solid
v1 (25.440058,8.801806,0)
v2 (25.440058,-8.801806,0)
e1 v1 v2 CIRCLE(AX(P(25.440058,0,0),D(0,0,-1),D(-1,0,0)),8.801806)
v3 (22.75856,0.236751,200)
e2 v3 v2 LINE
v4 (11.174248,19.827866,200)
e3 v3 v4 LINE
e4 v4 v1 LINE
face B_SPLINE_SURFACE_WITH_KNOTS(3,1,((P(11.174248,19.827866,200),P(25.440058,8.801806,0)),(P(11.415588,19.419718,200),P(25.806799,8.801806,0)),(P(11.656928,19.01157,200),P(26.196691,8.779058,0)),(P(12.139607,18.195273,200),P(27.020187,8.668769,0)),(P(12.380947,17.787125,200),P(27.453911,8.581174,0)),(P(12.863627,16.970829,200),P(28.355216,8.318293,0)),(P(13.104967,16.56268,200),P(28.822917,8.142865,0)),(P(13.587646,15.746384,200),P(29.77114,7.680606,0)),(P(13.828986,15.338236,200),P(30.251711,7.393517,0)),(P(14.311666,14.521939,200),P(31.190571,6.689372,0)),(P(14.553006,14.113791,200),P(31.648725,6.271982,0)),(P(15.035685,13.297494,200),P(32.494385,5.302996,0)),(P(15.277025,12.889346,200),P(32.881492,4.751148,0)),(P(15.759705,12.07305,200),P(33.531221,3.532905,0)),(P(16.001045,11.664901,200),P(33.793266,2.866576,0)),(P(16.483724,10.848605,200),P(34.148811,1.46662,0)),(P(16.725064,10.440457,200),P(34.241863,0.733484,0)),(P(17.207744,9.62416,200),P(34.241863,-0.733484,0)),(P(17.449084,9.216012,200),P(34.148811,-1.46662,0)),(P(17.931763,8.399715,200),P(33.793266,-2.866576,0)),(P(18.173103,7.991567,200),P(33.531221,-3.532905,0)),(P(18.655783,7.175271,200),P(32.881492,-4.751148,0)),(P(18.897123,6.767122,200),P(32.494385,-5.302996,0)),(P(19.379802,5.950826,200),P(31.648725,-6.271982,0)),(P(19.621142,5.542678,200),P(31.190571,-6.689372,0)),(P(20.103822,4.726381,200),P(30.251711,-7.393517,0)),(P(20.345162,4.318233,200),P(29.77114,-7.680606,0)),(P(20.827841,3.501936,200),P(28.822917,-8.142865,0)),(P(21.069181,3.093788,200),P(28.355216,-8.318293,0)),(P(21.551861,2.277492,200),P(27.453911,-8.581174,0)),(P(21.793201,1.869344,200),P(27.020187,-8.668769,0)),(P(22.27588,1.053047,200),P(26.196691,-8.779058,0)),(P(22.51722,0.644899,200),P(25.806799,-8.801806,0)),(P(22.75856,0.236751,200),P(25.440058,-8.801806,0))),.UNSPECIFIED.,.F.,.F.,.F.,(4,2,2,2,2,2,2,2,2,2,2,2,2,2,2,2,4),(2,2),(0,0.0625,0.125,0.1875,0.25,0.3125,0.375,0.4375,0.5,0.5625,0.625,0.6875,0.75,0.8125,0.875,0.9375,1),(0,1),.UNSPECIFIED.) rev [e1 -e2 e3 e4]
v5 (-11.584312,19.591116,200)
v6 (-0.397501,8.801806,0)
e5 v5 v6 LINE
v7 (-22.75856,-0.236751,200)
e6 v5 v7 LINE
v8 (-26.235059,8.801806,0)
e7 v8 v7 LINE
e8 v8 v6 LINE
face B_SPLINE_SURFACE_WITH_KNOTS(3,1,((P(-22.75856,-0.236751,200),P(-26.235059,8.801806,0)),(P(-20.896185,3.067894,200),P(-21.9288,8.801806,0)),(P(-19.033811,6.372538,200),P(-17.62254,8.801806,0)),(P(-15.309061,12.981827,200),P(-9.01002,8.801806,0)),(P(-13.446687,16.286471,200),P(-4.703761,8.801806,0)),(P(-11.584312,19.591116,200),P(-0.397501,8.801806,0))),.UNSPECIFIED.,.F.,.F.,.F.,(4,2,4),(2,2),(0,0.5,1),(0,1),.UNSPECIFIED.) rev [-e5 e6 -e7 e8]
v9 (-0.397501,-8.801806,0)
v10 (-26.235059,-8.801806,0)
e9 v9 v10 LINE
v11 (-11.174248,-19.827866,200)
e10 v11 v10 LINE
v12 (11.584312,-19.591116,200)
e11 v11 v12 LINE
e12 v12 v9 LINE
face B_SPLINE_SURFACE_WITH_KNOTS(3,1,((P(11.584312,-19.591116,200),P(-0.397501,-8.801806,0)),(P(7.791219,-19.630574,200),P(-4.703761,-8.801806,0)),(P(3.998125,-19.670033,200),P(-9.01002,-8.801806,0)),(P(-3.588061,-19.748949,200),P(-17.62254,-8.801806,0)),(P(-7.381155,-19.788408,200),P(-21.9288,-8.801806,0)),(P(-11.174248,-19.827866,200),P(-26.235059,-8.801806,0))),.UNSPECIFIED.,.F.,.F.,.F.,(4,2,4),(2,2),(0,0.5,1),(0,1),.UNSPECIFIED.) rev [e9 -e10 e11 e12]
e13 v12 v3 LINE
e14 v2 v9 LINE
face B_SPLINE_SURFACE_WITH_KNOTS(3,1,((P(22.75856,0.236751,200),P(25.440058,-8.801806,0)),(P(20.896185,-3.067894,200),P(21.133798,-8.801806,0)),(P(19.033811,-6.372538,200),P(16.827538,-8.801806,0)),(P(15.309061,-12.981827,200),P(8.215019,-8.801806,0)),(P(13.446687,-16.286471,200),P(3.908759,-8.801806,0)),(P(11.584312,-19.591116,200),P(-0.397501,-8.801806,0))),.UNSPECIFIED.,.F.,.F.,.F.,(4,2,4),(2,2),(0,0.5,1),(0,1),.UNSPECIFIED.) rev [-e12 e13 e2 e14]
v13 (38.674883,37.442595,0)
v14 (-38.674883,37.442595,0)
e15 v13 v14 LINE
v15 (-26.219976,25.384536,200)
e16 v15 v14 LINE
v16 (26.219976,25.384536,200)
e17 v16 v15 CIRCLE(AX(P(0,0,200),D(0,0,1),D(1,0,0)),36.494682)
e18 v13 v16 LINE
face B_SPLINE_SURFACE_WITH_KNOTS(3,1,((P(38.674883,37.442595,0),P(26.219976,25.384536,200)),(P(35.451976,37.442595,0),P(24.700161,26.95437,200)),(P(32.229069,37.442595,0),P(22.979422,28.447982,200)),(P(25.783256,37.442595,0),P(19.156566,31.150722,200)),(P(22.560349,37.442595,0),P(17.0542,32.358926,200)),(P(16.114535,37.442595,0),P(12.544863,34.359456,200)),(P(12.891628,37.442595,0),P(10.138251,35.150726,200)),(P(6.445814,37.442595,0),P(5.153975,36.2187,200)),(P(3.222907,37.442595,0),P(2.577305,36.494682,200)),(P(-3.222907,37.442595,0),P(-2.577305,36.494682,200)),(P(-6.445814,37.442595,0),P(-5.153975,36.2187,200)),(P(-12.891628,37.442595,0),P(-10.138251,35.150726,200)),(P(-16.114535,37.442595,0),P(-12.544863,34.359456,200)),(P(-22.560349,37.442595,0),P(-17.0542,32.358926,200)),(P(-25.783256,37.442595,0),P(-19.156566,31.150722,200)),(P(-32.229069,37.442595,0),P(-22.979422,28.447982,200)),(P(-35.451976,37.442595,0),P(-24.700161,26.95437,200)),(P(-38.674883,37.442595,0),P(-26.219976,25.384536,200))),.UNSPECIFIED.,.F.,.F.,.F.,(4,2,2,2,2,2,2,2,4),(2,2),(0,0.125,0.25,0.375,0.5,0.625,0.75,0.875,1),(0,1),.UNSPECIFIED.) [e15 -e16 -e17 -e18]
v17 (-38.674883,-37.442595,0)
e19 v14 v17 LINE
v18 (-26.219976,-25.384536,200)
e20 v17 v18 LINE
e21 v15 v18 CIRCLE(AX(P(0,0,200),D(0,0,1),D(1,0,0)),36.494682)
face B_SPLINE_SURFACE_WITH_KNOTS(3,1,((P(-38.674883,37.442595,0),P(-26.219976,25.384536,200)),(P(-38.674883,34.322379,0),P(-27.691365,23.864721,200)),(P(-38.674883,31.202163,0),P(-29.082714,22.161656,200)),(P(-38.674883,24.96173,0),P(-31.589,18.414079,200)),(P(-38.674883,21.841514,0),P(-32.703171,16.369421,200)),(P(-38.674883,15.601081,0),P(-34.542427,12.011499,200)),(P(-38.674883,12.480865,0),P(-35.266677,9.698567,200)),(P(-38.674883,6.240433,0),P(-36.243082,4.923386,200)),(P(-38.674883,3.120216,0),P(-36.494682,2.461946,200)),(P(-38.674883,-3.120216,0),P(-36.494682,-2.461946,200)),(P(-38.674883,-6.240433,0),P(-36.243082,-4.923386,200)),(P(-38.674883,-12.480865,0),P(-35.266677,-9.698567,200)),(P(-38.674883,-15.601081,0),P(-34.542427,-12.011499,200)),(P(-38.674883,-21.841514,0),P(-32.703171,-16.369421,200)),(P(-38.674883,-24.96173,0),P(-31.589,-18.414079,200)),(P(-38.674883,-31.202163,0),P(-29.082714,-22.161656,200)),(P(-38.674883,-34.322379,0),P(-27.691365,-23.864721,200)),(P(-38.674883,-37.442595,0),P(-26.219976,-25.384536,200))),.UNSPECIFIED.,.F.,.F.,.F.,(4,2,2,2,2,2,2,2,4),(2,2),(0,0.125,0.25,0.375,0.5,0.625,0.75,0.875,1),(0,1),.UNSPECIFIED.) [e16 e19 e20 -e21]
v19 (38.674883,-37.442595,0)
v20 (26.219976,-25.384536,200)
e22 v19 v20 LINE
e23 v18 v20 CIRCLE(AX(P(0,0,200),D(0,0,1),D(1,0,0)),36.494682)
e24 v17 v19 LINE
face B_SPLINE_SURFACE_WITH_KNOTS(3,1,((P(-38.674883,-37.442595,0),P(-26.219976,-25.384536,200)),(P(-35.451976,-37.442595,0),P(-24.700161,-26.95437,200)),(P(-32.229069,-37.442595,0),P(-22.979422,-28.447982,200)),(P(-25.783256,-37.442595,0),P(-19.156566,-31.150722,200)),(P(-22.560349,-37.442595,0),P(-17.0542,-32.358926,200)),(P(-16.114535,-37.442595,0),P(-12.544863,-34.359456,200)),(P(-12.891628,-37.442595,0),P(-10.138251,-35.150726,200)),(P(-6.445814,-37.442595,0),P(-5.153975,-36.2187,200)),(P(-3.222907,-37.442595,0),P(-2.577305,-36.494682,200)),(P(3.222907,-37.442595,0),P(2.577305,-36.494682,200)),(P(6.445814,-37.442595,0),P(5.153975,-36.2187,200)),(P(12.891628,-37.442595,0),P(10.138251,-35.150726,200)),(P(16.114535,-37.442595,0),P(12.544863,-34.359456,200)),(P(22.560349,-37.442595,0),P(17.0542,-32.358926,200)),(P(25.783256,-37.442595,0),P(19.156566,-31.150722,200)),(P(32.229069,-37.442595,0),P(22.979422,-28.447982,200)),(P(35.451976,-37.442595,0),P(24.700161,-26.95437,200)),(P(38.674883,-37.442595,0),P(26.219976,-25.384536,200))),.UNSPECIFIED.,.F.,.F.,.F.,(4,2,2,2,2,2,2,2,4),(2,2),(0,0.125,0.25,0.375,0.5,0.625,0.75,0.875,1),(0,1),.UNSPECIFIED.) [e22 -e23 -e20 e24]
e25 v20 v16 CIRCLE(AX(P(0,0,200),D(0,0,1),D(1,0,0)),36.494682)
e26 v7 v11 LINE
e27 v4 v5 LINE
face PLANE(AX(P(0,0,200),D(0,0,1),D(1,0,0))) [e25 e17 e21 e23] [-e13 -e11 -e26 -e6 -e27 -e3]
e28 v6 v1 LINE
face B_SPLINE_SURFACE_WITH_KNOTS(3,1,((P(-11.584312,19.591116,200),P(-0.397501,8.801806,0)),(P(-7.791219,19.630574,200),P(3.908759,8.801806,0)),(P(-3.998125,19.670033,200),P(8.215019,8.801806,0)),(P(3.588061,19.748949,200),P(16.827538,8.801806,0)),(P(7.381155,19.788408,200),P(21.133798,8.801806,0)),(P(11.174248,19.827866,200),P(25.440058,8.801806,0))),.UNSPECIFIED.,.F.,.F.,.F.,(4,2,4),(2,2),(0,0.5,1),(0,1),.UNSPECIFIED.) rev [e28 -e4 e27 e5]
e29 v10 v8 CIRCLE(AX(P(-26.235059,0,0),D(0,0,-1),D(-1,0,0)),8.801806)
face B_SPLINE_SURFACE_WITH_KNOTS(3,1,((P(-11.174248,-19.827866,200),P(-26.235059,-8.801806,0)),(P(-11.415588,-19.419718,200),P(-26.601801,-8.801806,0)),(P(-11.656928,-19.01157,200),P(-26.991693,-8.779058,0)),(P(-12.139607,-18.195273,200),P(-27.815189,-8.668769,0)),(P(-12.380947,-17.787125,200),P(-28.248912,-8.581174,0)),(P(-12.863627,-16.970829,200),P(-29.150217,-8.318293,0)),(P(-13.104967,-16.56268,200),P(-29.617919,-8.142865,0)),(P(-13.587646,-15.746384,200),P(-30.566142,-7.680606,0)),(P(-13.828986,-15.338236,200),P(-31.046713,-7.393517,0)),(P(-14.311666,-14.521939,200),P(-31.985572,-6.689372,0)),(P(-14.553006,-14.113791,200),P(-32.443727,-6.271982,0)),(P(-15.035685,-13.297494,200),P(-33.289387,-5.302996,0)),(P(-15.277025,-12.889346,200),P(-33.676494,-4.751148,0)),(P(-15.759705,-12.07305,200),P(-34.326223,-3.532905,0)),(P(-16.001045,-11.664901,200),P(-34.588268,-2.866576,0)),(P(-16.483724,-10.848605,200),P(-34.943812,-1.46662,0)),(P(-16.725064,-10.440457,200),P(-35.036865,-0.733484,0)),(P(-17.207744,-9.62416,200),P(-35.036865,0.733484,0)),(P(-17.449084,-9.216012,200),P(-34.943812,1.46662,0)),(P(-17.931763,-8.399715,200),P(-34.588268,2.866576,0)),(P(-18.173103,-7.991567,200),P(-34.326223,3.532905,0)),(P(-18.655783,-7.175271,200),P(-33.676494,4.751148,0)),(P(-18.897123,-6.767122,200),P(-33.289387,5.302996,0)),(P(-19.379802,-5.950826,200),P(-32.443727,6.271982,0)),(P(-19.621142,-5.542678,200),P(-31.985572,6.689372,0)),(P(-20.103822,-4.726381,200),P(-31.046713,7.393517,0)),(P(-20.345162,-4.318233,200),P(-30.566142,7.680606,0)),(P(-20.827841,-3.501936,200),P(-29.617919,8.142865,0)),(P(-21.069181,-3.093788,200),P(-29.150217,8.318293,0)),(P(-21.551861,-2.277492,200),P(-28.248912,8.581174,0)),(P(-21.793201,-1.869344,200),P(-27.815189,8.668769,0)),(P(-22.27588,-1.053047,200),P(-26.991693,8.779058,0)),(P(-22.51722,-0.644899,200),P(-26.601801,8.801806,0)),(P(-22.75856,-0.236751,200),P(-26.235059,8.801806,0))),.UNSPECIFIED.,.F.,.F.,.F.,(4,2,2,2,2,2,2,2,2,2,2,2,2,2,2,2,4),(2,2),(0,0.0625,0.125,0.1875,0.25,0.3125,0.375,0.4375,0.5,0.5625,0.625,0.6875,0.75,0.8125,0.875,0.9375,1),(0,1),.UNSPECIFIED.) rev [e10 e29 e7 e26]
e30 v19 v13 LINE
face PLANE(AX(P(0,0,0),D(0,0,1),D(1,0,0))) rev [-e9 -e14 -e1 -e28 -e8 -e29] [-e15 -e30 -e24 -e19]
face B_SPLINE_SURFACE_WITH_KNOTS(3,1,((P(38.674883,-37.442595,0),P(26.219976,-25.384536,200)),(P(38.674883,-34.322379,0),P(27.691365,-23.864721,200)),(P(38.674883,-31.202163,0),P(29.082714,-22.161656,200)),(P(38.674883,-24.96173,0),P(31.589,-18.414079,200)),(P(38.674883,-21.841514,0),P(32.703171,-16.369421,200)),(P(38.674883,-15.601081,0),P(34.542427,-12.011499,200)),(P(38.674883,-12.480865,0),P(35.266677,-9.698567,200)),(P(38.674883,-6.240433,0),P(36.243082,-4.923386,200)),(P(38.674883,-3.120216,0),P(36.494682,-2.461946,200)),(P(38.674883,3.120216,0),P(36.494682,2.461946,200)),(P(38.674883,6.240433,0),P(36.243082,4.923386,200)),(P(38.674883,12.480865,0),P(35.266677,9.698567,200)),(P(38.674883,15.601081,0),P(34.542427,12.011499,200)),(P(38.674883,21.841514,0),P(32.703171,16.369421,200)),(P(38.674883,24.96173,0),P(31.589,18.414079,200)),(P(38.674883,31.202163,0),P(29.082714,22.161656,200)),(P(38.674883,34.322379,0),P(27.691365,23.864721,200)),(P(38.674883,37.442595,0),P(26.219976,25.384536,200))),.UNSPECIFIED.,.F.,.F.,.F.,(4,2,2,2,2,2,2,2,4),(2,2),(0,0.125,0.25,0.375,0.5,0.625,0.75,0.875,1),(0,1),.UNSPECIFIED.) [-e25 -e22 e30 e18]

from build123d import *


with BuildPart() as part:
    # Esquisse2 → Lissage1 section 0
    with BuildSketch(Plane.XY):
        with BuildLine():
            Line((-38.674883287, 37.442595339), (38.674883287, 37.442595339))
            Line((38.674883287, 37.442595339), (38.674883287, -37.442595339))
            Line((38.674883287, -37.442595339), (-38.674883287, -37.442595339))
            Line((-38.674883287, -37.442595339), (-38.674883287, 37.442595339))
        make_face()
    # Esquisse1 for Lissage1 → Lissage1 section 1
    with BuildSketch(Plane.XY.offset(200)):
        with BuildLine():
            # circular arc as an exact rational Bezier (weights 1, cos(half-angle), 1)
            Bezier((-26.219975918, 25.384535509), (0, 52.467447345), (26.219975918, 25.384535509), weights=[1, 0.695568078, 1])
            Bezier((26.219975918, 25.384535509), (50.795690445, 0), (26.219975918, -25.384535509), weights=[1, 0.718460192, 1])
            Bezier((26.219975918, -25.384535509), (0, -52.467447345), (-26.219975918, -25.384535509), weights=[1, 0.695568078, 1])
            Bezier((-26.219975918, -25.384535509), (-50.795690445, 0), (-26.219975918, 25.384535509), weights=[1, 0.718460192, 1])
        make_face()
    loft()

    # Enlèvement de matière-Lissage1: read off the stored shape, not the designer's step
    # Enlèvement de matière-Lissage1: loft between two sections, ruled curve by curve
    enl_vement_de_mati_re_lissage1_from = [
        Edge.make_bspline([(-22.758559894, -0.236750535, 200), (-20.896185232, 3.067893847, 200), (-19.033810571, 6.372538228, 200), (-15.309061247, 12.981826991, 200), (-13.446686586, 16.286471373, 200), (-11.584311924, 19.591115754, 200)], [0, 0, 0, 0, 0.5, 0.5, 1, 1, 1, 1], 3),
        Edge.make_bspline([(-11.584311924, 19.591115754, 200), (-7.791218609, 19.630574177, 200), (-3.998125293, 19.670032599, 200), (3.588061338, 19.748949444, 200), (7.381154654, 19.788407866, 200), (11.174247969, 19.827866289, 200)], [0, 0, 0, 0, 0.5, 0.5, 1, 1, 1, 1], 3),
        Edge.make_bspline([(-11.174247969, -19.827866289, 200), (-11.415587801, -19.419718044, 200), (-11.656927633, -19.011569799, 200), (-12.139607297, -18.195273309, 200), (-12.380947128, -17.787125064, 200), (-12.863626792, -16.970828575, 200), (-13.104966624, -16.56268033, 200), (-13.587646287, -15.74638384, 200), (-13.828986119, -15.338235595, 200), (-14.311665782, -14.521939105, 200), (-14.553005614, -14.113790861, 200), (-15.035685278, -13.297494371, 200), (-15.277025109, -12.889346126, 200), (-15.759704773, -12.073049636, 200), (-16.001044605, -11.664901391, 200), (-16.483724268, -10.848604901, 200), (-16.7250641, -10.440456657, 200), (-17.207743763, -9.624160167, 200), (-17.449083595, -9.216011922, 200), (-17.931763259, -8.399715432, 200), (-18.17310309, -7.991567187, 200), (-18.655782754, -7.175270698, 200), (-18.897122586, -6.767122453, 200), (-19.379802249, -5.950825963, 200), (-19.621142081, -5.542677718, 200), (-20.103821744, -4.726381228, 200), (-20.345161576, -4.318232983, 200), (-20.82784124, -3.501936494, 200), (-21.069181071, -3.093788249, 200), (-21.551860735, -2.277491759, 200), (-21.793200567, -1.869343514, 200), (-22.27588023, -1.053047024, 200), (-22.517220062, -0.64489878, 200), (-22.758559894, -0.236750535, 200)], [0, 0, 0, 0, 0.0625, 0.0625, 0.125, 0.125, 0.1875, 0.1875, 0.25, 0.25, 0.3125, 0.3125, 0.375, 0.375, 0.4375, 0.4375, 0.5, 0.5, 0.5625, 0.5625, 0.625, 0.625, 0.6875, 0.6875, 0.75, 0.75, 0.8125, 0.8125, 0.875, 0.875, 0.9375, 0.9375, 1, 1, 1, 1], 3),
        Edge.make_bspline([(11.174247969, 19.827866289, 200), (11.415587801, 19.419718044, 200), (11.656927633, 19.011569799, 200), (12.139607297, 18.195273309, 200), (12.380947128, 17.787125064, 200), (12.863626792, 16.970828575, 200), (13.104966624, 16.56268033, 200), (13.587646287, 15.74638384, 200), (13.828986119, 15.338235595, 200), (14.311665782, 14.521939105, 200), (14.553005614, 14.113790861, 200), (15.035685278, 13.297494371, 200), (15.277025109, 12.889346126, 200), (15.759704773, 12.073049636, 200), (16.001044605, 11.664901391, 200), (16.483724268, 10.848604901, 200), (16.7250641, 10.440456657, 200), (17.207743763, 9.624160167, 200), (17.449083595, 9.216011922, 200), (17.931763259, 8.399715432, 200), (18.17310309, 7.991567187, 200), (18.655782754, 7.175270698, 200), (18.897122586, 6.767122453, 200), (19.379802249, 5.950825963, 200), (19.621142081, 5.542677718, 200), (20.103821744, 4.726381228, 200), (20.345161576, 4.318232983, 200), (20.82784124, 3.501936494, 200), (21.069181071, 3.093788249, 200), (21.551860735, 2.277491759, 200), (21.793200567, 1.869343514, 200), (22.27588023, 1.053047024, 200), (22.517220062, 0.64489878, 200), (22.758559894, 0.236750535, 200)], [0, 0, 0, 0, 0.0625, 0.0625, 0.125, 0.125, 0.1875, 0.1875, 0.25, 0.25, 0.3125, 0.3125, 0.375, 0.375, 0.4375, 0.4375, 0.5, 0.5, 0.5625, 0.5625, 0.625, 0.625, 0.6875, 0.6875, 0.75, 0.75, 0.8125, 0.8125, 0.875, 0.875, 0.9375, 0.9375, 1, 1, 1, 1], 3),
        Edge.make_bspline([(22.758559894, 0.236750535, 200), (20.896185232, -3.067893847, 200), (19.033810571, -6.372538228, 200), (15.309061247, -12.981826991, 200), (13.446686586, -16.286471373, 200), (11.584311924, -19.591115754, 200)], [0, 0, 0, 0, 0.5, 0.5, 1, 1, 1, 1], 3),
        Edge.make_bspline([(11.584311924, -19.591115754, 200), (7.791218609, -19.630574177, 200), (3.998125293, -19.670032599, 200), (-3.588061338, -19.748949444, 200), (-7.381154654, -19.788407866, 200), (-11.174247969, -19.827866289, 200)], [0, 0, 0, 0, 0.5, 0.5, 1, 1, 1, 1], 3),
    ]
    enl_vement_de_mati_re_lissage1_to = [
        Edge.make_bspline([(-26.235059358, 8.801805629, 0), (-21.928799615, 8.801805629, 0), (-17.622539872, 8.801805629, 0), (-9.010020385, 8.801805629, 0), (-4.703760642, 8.801805629, 0), (-0.397500899, 8.801805629, 0)], [0, 0, 0, 0, 0.5, 0.5, 1, 1, 1, 1], 3),
        Edge.make_bspline([(-0.397500899, 8.801805629, 0), (3.908758844, 8.801805629, 0), (8.215018587, 8.801805629, 0), (16.827538073, 8.801805629, 0), (21.133797816, 8.801805629, 0), (25.440057559, 8.801805629, 0)], [0, 0, 0, 0, 0.5, 0.5, 1, 1, 1, 1], 3),
        Edge.make_bspline([(-26.235059358, -8.801805629, 0), (-26.601801259, -8.801805629, 0), (-26.991692504, -8.779058383, 0), (-27.815188768, -8.668768704, 0), (-28.248912486, -8.581173701, 0), (-29.150217382, -8.318293106, 0), (-29.617918879, -8.142864745, 0), (-30.566141848, -7.680606048, 0), (-31.046713101, -7.393516728, 0), (-31.985572368, -6.689372278, 0), (-32.44372653, -6.271981593, 0), (-33.289386969, -5.302995672, 0), (-33.676493644, -4.751147675, 0), (-34.32622324, -3.532904681, 0), (-34.588268029, -2.866576224, 0), (-34.943812367, -1.466620394, 0), (-35.036864986, -0.733483802, 0), (-35.036864986, 0.733483802, 0), (-34.943812367, 1.466620394, 0), (-34.588268029, 2.866576224, 0), (-34.32622324, 3.532904681, 0), (-33.676493644, 4.751147675, 0), (-33.289386969, 5.302995672, 0), (-32.44372653, 6.271981593, 0), (-31.985572368, 6.689372278, 0), (-31.046713101, 7.393516728, 0), (-30.566141848, 7.680606048, 0), (-29.617918879, 8.142864745, 0), (-29.150217382, 8.318293106, 0), (-28.248912486, 8.581173701, 0), (-27.815188768, 8.668768704, 0), (-26.991692504, 8.779058383, 0), (-26.601801259, 8.801805629, 0), (-26.235059358, 8.801805629, 0)], [0, 0, 0, 0, 0.0625, 0.0625, 0.125, 0.125, 0.1875, 0.1875, 0.25, 0.25, 0.3125, 0.3125, 0.375, 0.375, 0.4375, 0.4375, 0.5, 0.5, 0.5625, 0.5625, 0.625, 0.625, 0.6875, 0.6875, 0.75, 0.75, 0.8125, 0.8125, 0.875, 0.875, 0.9375, 0.9375, 1, 1, 1, 1], 3),
        Edge.make_bspline([(25.440057559, 8.801805629, 0), (25.80679946, 8.801805629, 0), (26.196690705, 8.779058383, 0), (27.020186969, 8.668768704, 0), (27.453910687, 8.581173701, 0), (28.355215583, 8.318293106, 0), (28.82291708, 8.142864745, 0), (29.771140049, 7.680606048, 0), (30.251711303, 7.393516728, 0), (31.19057057, 6.689372278, 0), (31.648724731, 6.271981593, 0), (32.49438517, 5.302995672, 0), (32.881491845, 4.751147675, 0), (33.531221441, 3.532904681, 0), (33.79326623, 2.866576224, 0), (34.148810568, 1.466620394, 0), (34.241863188, 0.733483802, 0), (34.241863188, -0.733483802, 0), (34.148810568, -1.466620394, 0), (33.79326623, -2.866576224, 0), (33.531221441, -3.532904681, 0), (32.881491845, -4.751147675, 0), (32.49438517, -5.302995672, 0), (31.648724731, -6.271981593, 0), (31.19057057, -6.689372278, 0), (30.251711303, -7.393516728, 0), (29.771140049, -7.680606048, 0), (28.82291708, -8.142864745, 0), (28.355215583, -8.318293106, 0), (27.453910687, -8.581173701, 0), (27.020186969, -8.668768704, 0), (26.196690705, -8.779058383, 0), (25.80679946, -8.801805629, 0), (25.440057559, -8.801805629, 0)], [0, 0, 0, 0, 0.0625, 0.0625, 0.125, 0.125, 0.1875, 0.1875, 0.25, 0.25, 0.3125, 0.3125, 0.375, 0.375, 0.4375, 0.4375, 0.5, 0.5, 0.5625, 0.5625, 0.625, 0.625, 0.6875, 0.6875, 0.75, 0.75, 0.8125, 0.8125, 0.875, 0.875, 0.9375, 0.9375, 1, 1, 1, 1], 3),
        Edge.make_bspline([(25.440057559, -8.801805629, 0), (21.133797816, -8.801805629, 0), (16.827538073, -8.801805629, 0), (8.215018587, -8.801805629, 0), (3.908758844, -8.801805629, 0), (-0.397500899, -8.801805629, 0)], [0, 0, 0, 0, 0.5, 0.5, 1, 1, 1, 1], 3),
        Edge.make_bspline([(-0.397500899, -8.801805629, 0), (-4.703760642, -8.801805629, 0), (-9.010020385, -8.801805629, 0), (-17.622539872, -8.801805629, 0), (-21.928799615, -8.801805629, 0), (-26.235059358, -8.801805629, 0)], [0, 0, 0, 0, 0.5, 0.5, 1, 1, 1, 1], 3),
    ]
    enl_vement_de_mati_re_lissage1 = Solid(Shell([*[Face.make_surface_from_curves(enl_vement_de_mati_re_lissage1_from[k], enl_vement_de_mati_re_lissage1_to[k]) for k in range(6)], Face(Wire(enl_vement_de_mati_re_lissage1_from)), Face(Wire(enl_vement_de_mati_re_lissage1_to))]))
    add(enl_vement_de_mati_re_lissage1, mode=Mode.SUBTRACT)


solid = part.part
